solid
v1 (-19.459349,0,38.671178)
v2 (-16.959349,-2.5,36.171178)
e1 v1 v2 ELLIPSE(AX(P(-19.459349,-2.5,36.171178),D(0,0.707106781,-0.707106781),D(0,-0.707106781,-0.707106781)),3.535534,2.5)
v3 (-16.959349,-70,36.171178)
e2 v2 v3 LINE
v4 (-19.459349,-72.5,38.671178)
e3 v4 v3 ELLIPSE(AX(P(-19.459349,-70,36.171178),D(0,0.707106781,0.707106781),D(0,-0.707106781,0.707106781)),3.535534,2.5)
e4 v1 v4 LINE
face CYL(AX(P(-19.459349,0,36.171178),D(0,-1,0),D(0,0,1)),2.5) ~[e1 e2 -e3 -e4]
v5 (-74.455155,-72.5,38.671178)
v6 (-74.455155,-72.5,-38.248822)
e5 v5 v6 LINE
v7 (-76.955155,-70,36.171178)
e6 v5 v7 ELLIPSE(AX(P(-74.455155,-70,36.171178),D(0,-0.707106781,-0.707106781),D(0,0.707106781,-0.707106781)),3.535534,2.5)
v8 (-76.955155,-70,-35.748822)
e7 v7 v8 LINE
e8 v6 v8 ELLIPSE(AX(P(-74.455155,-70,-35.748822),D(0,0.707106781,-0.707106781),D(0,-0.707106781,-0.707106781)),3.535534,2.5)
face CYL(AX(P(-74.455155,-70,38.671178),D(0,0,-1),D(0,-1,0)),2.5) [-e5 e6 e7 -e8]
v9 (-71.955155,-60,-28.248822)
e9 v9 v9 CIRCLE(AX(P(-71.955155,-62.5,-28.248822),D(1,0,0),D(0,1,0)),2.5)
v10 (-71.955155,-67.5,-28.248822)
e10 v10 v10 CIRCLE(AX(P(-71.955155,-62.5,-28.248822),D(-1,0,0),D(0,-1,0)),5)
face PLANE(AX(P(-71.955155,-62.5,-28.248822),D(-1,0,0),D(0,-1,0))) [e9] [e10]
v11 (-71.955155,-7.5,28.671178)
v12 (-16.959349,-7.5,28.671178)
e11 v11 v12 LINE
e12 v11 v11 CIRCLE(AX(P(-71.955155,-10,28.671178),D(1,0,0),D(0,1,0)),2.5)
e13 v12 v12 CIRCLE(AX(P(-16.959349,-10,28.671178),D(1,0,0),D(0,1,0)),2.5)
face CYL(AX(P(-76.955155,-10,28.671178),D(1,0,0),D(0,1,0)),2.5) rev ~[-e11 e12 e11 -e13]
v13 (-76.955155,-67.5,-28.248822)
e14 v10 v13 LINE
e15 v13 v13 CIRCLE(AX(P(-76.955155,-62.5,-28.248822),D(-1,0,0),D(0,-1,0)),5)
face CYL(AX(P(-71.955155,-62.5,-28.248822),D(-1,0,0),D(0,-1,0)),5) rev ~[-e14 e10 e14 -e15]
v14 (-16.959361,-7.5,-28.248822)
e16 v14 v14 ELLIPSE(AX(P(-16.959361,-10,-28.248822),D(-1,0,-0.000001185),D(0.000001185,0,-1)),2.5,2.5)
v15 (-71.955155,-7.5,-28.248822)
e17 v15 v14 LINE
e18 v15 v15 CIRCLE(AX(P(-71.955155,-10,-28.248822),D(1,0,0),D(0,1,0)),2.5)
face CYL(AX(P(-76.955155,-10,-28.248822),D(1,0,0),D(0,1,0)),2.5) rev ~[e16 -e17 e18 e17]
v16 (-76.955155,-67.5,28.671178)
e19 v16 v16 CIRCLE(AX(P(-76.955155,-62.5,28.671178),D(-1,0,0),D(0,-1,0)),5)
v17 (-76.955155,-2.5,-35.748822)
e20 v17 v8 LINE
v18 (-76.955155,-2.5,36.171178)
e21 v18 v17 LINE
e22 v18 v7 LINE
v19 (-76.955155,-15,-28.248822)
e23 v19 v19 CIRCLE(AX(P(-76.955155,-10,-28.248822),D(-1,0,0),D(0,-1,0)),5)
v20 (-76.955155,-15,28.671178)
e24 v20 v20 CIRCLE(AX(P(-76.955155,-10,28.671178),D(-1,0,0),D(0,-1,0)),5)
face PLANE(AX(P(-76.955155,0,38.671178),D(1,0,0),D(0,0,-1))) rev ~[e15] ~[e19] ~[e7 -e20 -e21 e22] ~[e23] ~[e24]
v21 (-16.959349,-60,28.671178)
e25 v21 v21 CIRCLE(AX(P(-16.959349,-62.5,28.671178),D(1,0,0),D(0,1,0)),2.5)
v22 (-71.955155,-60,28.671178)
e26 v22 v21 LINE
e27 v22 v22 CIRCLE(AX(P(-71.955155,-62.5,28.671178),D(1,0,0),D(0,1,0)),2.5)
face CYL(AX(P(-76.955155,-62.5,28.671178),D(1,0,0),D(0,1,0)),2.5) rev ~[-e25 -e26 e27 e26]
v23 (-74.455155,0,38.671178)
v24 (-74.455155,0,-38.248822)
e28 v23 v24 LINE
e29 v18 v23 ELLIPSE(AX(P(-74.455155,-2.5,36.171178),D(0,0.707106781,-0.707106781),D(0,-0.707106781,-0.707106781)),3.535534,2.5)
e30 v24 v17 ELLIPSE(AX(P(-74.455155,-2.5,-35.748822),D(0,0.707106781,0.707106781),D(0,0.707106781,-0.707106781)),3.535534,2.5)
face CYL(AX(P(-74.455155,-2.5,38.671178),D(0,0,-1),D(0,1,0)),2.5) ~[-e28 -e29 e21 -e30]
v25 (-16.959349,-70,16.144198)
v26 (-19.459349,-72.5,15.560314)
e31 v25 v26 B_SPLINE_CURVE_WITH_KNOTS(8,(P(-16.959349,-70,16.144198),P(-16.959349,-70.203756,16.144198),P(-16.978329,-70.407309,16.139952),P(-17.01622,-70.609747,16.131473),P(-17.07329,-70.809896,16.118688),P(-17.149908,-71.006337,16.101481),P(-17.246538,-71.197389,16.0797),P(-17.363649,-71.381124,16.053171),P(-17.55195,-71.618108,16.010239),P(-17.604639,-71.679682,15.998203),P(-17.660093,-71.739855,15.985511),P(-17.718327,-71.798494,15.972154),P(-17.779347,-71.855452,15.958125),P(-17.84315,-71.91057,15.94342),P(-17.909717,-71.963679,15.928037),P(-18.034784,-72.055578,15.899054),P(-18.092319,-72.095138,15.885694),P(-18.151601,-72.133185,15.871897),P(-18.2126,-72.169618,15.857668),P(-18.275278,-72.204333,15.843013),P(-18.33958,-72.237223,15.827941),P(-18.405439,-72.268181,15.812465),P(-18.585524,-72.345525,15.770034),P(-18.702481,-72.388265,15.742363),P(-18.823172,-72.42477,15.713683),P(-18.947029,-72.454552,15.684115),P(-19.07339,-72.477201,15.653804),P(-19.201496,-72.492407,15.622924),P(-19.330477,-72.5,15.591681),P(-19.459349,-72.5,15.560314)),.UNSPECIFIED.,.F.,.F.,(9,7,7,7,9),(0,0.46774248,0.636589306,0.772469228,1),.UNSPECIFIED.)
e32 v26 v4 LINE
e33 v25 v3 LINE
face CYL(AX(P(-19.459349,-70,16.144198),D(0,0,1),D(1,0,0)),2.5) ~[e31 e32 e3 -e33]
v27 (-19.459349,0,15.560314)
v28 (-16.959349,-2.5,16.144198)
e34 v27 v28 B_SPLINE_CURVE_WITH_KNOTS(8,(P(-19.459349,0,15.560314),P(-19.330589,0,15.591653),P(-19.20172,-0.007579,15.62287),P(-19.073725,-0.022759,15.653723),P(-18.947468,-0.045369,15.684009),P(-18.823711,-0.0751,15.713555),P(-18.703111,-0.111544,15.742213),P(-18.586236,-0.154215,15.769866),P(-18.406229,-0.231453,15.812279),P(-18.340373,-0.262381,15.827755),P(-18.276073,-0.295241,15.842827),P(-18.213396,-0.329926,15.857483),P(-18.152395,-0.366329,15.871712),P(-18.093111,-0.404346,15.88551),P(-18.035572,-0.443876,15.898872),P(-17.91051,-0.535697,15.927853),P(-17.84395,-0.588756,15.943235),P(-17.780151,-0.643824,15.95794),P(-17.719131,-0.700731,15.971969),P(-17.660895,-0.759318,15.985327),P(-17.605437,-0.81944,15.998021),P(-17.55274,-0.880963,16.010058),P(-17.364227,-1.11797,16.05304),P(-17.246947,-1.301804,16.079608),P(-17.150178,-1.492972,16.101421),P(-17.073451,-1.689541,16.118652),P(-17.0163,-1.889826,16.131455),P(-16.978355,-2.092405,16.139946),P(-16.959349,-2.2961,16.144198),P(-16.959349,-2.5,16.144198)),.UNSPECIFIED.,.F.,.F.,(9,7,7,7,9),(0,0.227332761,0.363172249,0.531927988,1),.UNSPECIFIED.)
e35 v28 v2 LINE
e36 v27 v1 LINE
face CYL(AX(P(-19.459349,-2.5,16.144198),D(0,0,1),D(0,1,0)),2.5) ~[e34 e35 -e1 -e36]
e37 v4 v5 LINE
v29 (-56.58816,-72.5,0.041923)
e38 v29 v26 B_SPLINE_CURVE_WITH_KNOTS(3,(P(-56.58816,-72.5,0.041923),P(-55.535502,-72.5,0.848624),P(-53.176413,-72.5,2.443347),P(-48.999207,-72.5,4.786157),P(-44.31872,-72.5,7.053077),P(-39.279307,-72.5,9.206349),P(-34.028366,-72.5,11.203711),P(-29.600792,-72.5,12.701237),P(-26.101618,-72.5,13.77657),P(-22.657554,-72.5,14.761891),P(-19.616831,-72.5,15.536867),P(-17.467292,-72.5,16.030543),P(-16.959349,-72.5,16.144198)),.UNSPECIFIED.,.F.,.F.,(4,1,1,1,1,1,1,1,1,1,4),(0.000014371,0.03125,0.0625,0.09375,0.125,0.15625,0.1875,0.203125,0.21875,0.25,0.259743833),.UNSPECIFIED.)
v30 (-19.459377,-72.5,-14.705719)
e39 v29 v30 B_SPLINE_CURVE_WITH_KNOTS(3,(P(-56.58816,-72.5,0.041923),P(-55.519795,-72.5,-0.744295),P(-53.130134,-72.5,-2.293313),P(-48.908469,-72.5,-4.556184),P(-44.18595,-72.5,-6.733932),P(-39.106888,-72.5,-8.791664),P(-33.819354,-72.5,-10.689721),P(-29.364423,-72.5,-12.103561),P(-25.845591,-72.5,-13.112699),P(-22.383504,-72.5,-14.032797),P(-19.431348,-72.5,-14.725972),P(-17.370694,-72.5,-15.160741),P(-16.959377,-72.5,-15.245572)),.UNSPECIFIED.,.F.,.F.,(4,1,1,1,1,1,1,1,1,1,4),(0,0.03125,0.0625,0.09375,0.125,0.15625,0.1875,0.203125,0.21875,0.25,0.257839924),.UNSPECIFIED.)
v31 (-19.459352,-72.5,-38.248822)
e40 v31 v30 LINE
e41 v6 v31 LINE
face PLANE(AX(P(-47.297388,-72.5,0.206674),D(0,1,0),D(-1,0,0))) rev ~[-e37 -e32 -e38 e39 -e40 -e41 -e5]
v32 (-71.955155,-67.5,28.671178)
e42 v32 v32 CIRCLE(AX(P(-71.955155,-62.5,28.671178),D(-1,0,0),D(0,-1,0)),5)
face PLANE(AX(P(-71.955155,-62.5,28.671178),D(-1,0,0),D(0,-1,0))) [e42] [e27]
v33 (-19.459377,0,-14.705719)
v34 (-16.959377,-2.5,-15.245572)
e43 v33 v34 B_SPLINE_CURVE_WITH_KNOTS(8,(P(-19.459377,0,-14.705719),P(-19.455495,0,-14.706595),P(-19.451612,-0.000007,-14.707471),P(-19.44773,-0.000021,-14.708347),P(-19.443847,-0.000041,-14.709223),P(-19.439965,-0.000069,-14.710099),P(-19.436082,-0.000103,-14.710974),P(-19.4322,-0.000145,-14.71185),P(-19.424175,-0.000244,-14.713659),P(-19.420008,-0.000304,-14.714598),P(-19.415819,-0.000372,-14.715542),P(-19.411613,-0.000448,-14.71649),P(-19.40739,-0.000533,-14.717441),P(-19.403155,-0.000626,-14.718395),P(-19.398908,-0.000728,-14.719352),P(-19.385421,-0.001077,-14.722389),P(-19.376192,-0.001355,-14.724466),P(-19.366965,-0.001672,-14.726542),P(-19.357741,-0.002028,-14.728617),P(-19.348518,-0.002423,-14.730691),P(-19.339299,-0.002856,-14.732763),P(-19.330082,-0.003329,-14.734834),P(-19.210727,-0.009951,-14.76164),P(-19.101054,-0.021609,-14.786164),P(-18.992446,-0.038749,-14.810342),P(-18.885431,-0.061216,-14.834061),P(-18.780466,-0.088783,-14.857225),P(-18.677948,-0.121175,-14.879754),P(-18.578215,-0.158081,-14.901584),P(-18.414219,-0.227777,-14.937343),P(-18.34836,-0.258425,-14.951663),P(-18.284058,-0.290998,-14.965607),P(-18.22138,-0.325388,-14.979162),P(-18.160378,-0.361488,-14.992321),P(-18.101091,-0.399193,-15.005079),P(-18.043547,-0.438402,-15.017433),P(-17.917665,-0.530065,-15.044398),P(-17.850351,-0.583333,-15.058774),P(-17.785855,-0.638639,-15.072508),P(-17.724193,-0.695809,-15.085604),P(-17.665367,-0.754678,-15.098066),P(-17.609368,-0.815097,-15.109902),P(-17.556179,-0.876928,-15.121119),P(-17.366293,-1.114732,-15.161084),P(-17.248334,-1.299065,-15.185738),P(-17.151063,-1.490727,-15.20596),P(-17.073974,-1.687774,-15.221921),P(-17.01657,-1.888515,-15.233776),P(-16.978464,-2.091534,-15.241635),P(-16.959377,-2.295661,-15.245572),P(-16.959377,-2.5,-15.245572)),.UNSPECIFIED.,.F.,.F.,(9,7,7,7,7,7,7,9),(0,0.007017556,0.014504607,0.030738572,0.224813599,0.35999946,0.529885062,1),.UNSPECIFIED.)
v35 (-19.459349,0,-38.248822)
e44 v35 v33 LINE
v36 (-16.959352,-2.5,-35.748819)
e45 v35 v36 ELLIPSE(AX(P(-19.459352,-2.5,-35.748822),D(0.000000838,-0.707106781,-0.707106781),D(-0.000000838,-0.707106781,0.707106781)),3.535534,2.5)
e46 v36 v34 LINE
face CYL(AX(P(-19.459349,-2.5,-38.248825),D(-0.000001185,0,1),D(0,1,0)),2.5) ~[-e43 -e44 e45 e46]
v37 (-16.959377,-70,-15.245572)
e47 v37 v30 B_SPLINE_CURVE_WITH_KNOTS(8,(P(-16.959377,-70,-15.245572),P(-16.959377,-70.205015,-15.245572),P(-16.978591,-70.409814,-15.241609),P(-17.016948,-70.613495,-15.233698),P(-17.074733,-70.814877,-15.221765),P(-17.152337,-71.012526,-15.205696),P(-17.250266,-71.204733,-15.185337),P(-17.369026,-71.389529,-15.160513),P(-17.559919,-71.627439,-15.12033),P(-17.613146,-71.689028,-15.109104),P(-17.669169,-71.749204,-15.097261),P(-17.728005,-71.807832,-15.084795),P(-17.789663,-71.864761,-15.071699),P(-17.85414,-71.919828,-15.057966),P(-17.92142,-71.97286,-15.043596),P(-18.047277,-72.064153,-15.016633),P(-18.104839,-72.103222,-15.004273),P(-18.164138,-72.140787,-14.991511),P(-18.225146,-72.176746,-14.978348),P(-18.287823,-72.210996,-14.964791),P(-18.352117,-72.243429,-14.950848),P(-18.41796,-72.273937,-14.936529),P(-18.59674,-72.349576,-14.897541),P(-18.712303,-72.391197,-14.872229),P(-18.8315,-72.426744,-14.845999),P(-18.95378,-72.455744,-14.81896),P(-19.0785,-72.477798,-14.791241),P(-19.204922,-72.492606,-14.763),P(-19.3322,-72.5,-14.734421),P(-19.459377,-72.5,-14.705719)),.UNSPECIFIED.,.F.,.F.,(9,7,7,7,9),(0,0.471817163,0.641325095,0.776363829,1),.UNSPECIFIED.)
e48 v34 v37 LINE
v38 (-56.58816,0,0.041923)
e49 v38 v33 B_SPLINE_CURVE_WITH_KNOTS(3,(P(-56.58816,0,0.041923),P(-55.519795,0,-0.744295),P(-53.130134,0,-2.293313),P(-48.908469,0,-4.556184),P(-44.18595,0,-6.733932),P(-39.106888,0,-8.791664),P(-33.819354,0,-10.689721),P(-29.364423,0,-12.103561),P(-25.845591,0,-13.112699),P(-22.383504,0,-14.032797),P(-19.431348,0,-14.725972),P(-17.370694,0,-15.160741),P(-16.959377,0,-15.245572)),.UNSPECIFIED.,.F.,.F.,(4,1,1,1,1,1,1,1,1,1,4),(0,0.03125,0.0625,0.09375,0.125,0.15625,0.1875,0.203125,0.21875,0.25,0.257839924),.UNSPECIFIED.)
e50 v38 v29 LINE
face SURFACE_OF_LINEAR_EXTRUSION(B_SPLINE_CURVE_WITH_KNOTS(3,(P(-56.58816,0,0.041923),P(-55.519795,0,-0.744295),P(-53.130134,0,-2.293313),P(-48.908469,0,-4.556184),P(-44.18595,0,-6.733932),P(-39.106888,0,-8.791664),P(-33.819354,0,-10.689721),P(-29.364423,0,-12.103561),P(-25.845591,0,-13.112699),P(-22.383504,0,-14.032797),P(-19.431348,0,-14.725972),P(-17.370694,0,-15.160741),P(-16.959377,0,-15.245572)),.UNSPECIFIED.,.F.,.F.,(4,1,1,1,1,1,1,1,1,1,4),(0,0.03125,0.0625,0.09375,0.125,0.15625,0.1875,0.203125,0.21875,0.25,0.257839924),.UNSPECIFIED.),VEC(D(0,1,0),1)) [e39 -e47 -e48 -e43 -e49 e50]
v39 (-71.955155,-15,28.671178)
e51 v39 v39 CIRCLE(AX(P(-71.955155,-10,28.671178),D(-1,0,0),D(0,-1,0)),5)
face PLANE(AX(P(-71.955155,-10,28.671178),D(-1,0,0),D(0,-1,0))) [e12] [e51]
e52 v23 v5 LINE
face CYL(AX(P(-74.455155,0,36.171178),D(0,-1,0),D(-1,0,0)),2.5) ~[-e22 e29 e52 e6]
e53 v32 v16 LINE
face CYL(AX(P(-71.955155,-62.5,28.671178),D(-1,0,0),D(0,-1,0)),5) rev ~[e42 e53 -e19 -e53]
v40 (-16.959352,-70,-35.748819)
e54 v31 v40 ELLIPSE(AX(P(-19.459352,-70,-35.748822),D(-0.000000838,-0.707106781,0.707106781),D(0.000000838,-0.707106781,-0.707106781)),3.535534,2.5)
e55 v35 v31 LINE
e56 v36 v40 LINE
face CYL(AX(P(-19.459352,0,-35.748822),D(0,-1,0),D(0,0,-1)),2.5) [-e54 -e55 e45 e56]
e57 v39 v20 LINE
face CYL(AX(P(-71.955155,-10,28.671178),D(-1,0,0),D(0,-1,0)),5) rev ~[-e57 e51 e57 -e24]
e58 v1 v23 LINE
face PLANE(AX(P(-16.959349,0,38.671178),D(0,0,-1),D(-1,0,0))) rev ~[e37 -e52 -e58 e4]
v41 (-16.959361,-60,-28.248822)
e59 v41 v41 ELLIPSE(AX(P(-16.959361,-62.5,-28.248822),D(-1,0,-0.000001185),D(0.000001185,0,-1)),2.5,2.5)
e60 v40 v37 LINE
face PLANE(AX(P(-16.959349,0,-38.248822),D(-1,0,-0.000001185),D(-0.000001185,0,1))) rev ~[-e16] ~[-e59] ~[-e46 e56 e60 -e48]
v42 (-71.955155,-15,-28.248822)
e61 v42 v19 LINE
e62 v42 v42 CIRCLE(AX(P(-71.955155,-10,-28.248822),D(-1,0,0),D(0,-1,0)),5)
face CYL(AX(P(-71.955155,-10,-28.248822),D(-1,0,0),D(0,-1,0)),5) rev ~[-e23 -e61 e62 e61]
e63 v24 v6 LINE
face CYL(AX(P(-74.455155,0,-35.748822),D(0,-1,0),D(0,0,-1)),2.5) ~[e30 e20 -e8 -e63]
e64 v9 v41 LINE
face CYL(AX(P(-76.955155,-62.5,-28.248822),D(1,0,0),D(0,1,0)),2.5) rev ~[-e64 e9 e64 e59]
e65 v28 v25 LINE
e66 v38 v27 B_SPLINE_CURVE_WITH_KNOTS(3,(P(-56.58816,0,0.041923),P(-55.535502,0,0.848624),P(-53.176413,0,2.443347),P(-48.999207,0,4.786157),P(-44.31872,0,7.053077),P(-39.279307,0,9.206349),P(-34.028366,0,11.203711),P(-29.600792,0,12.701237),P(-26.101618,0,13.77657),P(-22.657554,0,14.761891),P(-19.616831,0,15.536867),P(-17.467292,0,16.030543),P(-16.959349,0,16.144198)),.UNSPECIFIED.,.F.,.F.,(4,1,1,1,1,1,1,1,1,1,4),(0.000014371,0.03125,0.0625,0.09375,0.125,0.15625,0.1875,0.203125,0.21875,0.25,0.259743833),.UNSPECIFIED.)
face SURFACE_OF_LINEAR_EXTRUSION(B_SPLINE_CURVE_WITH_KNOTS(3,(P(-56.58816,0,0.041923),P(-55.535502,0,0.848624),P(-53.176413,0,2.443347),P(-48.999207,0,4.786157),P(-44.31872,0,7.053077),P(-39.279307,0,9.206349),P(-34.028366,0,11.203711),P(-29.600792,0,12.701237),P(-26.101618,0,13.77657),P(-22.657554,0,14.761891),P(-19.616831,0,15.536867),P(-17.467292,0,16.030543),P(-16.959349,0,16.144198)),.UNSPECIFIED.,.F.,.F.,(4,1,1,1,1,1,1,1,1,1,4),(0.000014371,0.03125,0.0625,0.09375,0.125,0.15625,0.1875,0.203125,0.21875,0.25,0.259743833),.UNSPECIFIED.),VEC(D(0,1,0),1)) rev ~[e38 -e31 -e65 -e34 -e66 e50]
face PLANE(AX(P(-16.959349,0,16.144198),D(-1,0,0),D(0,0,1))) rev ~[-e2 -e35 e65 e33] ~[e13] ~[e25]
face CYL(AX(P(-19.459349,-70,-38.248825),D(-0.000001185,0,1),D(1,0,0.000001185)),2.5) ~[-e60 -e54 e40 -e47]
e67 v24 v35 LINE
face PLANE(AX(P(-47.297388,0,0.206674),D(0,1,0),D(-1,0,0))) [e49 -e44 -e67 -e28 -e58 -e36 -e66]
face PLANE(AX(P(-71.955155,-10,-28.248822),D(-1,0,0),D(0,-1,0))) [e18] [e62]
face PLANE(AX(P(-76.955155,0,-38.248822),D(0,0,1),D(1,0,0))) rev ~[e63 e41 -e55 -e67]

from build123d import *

# Parameters (mm, degrees)
F1_DEPTH       = 72.5
F3_D           = 5
F3_CBORE_D     = 10
F3_CBORE_DEPTH = 5
F4_R           = 2.5
F5_R           = 2.5


# Not quite as in the source:
# - ends of sketch curves that miss each other by under 0.0002 mm in the source are joined
# - the dataset's text gives a spline's control points without its knots; the knots are read off the source's solid


with BuildPart() as f1:
    # F0 (on Front) → F1 (new body)
    with BuildSketch(Plane.XZ):
        with BuildLine():
            add(Edge.make_bspline(
                [(-56.5881601574, 0.0419234738), (-55.5197950815, -0.7442946781), (-53.1301338185, -2.2933127374), (-48.9084685045, -4.5561843947), (-44.1859500973, -6.7339324001), (-39.1068883918, -8.7916644331), (-33.8193544964, -10.6897211609), (-29.3644227389, -12.1035605133), (-25.8455914341, -13.1126993817), (-22.383504382, -14.0327971877), (-19.4313477815, -14.7259719893), (-17.3706943762, -15.160741157), (-16.9593766332, -15.2455717325)],
                knots=[0, 0, 0, 0, 0.03125, 0.0625, 0.09375, 0.125, 0.15625, 0.1875, 0.203125, 0.21875, 0.25, 0.2578399244, 0.2578399244, 0.2578399244, 0.2578399244], degree=3))
            add(Edge.make_bspline(
                [(-56.5881601574, 0.0419234738), (-55.5355017666, 0.8486239051), (-53.1764131036, 2.443347048), (-48.9992069483, 4.7861572474), (-44.3187202519, 7.053077305), (-39.2793074327, 9.2063486815), (-34.0283660726, 11.2037109249), (-29.6007919855, 12.7012369201), (-26.1016179695, 13.7765699234), (-22.65755408, 14.761891198), (-19.6168305087, 15.5368665147), (-17.4672919643, 16.0305431026), (-16.9593493648, 16.1441983995)],
                knots=[1.43705e-05, 1.43705e-05, 1.43705e-05, 1.43705e-05, 0.03125, 0.0625, 0.09375, 0.125, 0.15625, 0.1875, 0.203125, 0.21875, 0.25, 0.2597438328, 0.2597438328, 0.2597438328, 0.2597438328], degree=3))
            Line((-16.9593493648, 16.1441983995), (-16.9593493648, 38.671177907))
            Line((-16.9593493648, 38.671177907), (-76.9551545382, 38.671177907))
            Line((-76.9551545382, 38.671177907), (-76.9551545382, -38.248822093))
            Line((-76.9551545382, -38.248822093), (-16.9593493648, -38.248822093))
            Line((-16.9593493648, -38.248822093), (-16.9593766332, -15.2455717325))
        make_face()
    extrude(amount=F1_DEPTH)

    # F3 (through all)
    with Locations(Plane(origin=(-76.9551545382, 0, 0), x_dir=(0, -1, 0), z_dir=(-1, 0, 0))):
        with Locations((10, 28.671177907), (62.5, 28.671177907), (62.5, -28.248822093), (10, -28.248822093)):
            CounterBoreHole(F3_D / 2, F3_CBORE_D / 2, F3_CBORE_DEPTH)

    # F4
    f4_edges = [f1.edges().sort_by_distance(p)[0] for p in [
        (-76.955155, -72.5, 0.211178),
        (-76.955155, -36.25, 38.671178),
        (-76.955155, 0, 0.211178),
        (-76.955155, -36.25, -38.248822),
    ]]
    fillet(f4_edges, radius=F4_R)

    # F5
    f5_edges = [f1.edges().sort_by_distance(p)[0] for p in [
        (-16.959349, -36.25, 38.671178),
        (-16.959349, -72.5, 27.407688),
        (-16.959349, 0, 27.407688),
        (-16.959363, 0, -26.747197),
        (-16.959349, -36.25, -38.248822),
        (-16.959363, -72.5, -26.747197),
    ]]
    fillet(f5_edges, radius=F5_R)


solid = f1.part
